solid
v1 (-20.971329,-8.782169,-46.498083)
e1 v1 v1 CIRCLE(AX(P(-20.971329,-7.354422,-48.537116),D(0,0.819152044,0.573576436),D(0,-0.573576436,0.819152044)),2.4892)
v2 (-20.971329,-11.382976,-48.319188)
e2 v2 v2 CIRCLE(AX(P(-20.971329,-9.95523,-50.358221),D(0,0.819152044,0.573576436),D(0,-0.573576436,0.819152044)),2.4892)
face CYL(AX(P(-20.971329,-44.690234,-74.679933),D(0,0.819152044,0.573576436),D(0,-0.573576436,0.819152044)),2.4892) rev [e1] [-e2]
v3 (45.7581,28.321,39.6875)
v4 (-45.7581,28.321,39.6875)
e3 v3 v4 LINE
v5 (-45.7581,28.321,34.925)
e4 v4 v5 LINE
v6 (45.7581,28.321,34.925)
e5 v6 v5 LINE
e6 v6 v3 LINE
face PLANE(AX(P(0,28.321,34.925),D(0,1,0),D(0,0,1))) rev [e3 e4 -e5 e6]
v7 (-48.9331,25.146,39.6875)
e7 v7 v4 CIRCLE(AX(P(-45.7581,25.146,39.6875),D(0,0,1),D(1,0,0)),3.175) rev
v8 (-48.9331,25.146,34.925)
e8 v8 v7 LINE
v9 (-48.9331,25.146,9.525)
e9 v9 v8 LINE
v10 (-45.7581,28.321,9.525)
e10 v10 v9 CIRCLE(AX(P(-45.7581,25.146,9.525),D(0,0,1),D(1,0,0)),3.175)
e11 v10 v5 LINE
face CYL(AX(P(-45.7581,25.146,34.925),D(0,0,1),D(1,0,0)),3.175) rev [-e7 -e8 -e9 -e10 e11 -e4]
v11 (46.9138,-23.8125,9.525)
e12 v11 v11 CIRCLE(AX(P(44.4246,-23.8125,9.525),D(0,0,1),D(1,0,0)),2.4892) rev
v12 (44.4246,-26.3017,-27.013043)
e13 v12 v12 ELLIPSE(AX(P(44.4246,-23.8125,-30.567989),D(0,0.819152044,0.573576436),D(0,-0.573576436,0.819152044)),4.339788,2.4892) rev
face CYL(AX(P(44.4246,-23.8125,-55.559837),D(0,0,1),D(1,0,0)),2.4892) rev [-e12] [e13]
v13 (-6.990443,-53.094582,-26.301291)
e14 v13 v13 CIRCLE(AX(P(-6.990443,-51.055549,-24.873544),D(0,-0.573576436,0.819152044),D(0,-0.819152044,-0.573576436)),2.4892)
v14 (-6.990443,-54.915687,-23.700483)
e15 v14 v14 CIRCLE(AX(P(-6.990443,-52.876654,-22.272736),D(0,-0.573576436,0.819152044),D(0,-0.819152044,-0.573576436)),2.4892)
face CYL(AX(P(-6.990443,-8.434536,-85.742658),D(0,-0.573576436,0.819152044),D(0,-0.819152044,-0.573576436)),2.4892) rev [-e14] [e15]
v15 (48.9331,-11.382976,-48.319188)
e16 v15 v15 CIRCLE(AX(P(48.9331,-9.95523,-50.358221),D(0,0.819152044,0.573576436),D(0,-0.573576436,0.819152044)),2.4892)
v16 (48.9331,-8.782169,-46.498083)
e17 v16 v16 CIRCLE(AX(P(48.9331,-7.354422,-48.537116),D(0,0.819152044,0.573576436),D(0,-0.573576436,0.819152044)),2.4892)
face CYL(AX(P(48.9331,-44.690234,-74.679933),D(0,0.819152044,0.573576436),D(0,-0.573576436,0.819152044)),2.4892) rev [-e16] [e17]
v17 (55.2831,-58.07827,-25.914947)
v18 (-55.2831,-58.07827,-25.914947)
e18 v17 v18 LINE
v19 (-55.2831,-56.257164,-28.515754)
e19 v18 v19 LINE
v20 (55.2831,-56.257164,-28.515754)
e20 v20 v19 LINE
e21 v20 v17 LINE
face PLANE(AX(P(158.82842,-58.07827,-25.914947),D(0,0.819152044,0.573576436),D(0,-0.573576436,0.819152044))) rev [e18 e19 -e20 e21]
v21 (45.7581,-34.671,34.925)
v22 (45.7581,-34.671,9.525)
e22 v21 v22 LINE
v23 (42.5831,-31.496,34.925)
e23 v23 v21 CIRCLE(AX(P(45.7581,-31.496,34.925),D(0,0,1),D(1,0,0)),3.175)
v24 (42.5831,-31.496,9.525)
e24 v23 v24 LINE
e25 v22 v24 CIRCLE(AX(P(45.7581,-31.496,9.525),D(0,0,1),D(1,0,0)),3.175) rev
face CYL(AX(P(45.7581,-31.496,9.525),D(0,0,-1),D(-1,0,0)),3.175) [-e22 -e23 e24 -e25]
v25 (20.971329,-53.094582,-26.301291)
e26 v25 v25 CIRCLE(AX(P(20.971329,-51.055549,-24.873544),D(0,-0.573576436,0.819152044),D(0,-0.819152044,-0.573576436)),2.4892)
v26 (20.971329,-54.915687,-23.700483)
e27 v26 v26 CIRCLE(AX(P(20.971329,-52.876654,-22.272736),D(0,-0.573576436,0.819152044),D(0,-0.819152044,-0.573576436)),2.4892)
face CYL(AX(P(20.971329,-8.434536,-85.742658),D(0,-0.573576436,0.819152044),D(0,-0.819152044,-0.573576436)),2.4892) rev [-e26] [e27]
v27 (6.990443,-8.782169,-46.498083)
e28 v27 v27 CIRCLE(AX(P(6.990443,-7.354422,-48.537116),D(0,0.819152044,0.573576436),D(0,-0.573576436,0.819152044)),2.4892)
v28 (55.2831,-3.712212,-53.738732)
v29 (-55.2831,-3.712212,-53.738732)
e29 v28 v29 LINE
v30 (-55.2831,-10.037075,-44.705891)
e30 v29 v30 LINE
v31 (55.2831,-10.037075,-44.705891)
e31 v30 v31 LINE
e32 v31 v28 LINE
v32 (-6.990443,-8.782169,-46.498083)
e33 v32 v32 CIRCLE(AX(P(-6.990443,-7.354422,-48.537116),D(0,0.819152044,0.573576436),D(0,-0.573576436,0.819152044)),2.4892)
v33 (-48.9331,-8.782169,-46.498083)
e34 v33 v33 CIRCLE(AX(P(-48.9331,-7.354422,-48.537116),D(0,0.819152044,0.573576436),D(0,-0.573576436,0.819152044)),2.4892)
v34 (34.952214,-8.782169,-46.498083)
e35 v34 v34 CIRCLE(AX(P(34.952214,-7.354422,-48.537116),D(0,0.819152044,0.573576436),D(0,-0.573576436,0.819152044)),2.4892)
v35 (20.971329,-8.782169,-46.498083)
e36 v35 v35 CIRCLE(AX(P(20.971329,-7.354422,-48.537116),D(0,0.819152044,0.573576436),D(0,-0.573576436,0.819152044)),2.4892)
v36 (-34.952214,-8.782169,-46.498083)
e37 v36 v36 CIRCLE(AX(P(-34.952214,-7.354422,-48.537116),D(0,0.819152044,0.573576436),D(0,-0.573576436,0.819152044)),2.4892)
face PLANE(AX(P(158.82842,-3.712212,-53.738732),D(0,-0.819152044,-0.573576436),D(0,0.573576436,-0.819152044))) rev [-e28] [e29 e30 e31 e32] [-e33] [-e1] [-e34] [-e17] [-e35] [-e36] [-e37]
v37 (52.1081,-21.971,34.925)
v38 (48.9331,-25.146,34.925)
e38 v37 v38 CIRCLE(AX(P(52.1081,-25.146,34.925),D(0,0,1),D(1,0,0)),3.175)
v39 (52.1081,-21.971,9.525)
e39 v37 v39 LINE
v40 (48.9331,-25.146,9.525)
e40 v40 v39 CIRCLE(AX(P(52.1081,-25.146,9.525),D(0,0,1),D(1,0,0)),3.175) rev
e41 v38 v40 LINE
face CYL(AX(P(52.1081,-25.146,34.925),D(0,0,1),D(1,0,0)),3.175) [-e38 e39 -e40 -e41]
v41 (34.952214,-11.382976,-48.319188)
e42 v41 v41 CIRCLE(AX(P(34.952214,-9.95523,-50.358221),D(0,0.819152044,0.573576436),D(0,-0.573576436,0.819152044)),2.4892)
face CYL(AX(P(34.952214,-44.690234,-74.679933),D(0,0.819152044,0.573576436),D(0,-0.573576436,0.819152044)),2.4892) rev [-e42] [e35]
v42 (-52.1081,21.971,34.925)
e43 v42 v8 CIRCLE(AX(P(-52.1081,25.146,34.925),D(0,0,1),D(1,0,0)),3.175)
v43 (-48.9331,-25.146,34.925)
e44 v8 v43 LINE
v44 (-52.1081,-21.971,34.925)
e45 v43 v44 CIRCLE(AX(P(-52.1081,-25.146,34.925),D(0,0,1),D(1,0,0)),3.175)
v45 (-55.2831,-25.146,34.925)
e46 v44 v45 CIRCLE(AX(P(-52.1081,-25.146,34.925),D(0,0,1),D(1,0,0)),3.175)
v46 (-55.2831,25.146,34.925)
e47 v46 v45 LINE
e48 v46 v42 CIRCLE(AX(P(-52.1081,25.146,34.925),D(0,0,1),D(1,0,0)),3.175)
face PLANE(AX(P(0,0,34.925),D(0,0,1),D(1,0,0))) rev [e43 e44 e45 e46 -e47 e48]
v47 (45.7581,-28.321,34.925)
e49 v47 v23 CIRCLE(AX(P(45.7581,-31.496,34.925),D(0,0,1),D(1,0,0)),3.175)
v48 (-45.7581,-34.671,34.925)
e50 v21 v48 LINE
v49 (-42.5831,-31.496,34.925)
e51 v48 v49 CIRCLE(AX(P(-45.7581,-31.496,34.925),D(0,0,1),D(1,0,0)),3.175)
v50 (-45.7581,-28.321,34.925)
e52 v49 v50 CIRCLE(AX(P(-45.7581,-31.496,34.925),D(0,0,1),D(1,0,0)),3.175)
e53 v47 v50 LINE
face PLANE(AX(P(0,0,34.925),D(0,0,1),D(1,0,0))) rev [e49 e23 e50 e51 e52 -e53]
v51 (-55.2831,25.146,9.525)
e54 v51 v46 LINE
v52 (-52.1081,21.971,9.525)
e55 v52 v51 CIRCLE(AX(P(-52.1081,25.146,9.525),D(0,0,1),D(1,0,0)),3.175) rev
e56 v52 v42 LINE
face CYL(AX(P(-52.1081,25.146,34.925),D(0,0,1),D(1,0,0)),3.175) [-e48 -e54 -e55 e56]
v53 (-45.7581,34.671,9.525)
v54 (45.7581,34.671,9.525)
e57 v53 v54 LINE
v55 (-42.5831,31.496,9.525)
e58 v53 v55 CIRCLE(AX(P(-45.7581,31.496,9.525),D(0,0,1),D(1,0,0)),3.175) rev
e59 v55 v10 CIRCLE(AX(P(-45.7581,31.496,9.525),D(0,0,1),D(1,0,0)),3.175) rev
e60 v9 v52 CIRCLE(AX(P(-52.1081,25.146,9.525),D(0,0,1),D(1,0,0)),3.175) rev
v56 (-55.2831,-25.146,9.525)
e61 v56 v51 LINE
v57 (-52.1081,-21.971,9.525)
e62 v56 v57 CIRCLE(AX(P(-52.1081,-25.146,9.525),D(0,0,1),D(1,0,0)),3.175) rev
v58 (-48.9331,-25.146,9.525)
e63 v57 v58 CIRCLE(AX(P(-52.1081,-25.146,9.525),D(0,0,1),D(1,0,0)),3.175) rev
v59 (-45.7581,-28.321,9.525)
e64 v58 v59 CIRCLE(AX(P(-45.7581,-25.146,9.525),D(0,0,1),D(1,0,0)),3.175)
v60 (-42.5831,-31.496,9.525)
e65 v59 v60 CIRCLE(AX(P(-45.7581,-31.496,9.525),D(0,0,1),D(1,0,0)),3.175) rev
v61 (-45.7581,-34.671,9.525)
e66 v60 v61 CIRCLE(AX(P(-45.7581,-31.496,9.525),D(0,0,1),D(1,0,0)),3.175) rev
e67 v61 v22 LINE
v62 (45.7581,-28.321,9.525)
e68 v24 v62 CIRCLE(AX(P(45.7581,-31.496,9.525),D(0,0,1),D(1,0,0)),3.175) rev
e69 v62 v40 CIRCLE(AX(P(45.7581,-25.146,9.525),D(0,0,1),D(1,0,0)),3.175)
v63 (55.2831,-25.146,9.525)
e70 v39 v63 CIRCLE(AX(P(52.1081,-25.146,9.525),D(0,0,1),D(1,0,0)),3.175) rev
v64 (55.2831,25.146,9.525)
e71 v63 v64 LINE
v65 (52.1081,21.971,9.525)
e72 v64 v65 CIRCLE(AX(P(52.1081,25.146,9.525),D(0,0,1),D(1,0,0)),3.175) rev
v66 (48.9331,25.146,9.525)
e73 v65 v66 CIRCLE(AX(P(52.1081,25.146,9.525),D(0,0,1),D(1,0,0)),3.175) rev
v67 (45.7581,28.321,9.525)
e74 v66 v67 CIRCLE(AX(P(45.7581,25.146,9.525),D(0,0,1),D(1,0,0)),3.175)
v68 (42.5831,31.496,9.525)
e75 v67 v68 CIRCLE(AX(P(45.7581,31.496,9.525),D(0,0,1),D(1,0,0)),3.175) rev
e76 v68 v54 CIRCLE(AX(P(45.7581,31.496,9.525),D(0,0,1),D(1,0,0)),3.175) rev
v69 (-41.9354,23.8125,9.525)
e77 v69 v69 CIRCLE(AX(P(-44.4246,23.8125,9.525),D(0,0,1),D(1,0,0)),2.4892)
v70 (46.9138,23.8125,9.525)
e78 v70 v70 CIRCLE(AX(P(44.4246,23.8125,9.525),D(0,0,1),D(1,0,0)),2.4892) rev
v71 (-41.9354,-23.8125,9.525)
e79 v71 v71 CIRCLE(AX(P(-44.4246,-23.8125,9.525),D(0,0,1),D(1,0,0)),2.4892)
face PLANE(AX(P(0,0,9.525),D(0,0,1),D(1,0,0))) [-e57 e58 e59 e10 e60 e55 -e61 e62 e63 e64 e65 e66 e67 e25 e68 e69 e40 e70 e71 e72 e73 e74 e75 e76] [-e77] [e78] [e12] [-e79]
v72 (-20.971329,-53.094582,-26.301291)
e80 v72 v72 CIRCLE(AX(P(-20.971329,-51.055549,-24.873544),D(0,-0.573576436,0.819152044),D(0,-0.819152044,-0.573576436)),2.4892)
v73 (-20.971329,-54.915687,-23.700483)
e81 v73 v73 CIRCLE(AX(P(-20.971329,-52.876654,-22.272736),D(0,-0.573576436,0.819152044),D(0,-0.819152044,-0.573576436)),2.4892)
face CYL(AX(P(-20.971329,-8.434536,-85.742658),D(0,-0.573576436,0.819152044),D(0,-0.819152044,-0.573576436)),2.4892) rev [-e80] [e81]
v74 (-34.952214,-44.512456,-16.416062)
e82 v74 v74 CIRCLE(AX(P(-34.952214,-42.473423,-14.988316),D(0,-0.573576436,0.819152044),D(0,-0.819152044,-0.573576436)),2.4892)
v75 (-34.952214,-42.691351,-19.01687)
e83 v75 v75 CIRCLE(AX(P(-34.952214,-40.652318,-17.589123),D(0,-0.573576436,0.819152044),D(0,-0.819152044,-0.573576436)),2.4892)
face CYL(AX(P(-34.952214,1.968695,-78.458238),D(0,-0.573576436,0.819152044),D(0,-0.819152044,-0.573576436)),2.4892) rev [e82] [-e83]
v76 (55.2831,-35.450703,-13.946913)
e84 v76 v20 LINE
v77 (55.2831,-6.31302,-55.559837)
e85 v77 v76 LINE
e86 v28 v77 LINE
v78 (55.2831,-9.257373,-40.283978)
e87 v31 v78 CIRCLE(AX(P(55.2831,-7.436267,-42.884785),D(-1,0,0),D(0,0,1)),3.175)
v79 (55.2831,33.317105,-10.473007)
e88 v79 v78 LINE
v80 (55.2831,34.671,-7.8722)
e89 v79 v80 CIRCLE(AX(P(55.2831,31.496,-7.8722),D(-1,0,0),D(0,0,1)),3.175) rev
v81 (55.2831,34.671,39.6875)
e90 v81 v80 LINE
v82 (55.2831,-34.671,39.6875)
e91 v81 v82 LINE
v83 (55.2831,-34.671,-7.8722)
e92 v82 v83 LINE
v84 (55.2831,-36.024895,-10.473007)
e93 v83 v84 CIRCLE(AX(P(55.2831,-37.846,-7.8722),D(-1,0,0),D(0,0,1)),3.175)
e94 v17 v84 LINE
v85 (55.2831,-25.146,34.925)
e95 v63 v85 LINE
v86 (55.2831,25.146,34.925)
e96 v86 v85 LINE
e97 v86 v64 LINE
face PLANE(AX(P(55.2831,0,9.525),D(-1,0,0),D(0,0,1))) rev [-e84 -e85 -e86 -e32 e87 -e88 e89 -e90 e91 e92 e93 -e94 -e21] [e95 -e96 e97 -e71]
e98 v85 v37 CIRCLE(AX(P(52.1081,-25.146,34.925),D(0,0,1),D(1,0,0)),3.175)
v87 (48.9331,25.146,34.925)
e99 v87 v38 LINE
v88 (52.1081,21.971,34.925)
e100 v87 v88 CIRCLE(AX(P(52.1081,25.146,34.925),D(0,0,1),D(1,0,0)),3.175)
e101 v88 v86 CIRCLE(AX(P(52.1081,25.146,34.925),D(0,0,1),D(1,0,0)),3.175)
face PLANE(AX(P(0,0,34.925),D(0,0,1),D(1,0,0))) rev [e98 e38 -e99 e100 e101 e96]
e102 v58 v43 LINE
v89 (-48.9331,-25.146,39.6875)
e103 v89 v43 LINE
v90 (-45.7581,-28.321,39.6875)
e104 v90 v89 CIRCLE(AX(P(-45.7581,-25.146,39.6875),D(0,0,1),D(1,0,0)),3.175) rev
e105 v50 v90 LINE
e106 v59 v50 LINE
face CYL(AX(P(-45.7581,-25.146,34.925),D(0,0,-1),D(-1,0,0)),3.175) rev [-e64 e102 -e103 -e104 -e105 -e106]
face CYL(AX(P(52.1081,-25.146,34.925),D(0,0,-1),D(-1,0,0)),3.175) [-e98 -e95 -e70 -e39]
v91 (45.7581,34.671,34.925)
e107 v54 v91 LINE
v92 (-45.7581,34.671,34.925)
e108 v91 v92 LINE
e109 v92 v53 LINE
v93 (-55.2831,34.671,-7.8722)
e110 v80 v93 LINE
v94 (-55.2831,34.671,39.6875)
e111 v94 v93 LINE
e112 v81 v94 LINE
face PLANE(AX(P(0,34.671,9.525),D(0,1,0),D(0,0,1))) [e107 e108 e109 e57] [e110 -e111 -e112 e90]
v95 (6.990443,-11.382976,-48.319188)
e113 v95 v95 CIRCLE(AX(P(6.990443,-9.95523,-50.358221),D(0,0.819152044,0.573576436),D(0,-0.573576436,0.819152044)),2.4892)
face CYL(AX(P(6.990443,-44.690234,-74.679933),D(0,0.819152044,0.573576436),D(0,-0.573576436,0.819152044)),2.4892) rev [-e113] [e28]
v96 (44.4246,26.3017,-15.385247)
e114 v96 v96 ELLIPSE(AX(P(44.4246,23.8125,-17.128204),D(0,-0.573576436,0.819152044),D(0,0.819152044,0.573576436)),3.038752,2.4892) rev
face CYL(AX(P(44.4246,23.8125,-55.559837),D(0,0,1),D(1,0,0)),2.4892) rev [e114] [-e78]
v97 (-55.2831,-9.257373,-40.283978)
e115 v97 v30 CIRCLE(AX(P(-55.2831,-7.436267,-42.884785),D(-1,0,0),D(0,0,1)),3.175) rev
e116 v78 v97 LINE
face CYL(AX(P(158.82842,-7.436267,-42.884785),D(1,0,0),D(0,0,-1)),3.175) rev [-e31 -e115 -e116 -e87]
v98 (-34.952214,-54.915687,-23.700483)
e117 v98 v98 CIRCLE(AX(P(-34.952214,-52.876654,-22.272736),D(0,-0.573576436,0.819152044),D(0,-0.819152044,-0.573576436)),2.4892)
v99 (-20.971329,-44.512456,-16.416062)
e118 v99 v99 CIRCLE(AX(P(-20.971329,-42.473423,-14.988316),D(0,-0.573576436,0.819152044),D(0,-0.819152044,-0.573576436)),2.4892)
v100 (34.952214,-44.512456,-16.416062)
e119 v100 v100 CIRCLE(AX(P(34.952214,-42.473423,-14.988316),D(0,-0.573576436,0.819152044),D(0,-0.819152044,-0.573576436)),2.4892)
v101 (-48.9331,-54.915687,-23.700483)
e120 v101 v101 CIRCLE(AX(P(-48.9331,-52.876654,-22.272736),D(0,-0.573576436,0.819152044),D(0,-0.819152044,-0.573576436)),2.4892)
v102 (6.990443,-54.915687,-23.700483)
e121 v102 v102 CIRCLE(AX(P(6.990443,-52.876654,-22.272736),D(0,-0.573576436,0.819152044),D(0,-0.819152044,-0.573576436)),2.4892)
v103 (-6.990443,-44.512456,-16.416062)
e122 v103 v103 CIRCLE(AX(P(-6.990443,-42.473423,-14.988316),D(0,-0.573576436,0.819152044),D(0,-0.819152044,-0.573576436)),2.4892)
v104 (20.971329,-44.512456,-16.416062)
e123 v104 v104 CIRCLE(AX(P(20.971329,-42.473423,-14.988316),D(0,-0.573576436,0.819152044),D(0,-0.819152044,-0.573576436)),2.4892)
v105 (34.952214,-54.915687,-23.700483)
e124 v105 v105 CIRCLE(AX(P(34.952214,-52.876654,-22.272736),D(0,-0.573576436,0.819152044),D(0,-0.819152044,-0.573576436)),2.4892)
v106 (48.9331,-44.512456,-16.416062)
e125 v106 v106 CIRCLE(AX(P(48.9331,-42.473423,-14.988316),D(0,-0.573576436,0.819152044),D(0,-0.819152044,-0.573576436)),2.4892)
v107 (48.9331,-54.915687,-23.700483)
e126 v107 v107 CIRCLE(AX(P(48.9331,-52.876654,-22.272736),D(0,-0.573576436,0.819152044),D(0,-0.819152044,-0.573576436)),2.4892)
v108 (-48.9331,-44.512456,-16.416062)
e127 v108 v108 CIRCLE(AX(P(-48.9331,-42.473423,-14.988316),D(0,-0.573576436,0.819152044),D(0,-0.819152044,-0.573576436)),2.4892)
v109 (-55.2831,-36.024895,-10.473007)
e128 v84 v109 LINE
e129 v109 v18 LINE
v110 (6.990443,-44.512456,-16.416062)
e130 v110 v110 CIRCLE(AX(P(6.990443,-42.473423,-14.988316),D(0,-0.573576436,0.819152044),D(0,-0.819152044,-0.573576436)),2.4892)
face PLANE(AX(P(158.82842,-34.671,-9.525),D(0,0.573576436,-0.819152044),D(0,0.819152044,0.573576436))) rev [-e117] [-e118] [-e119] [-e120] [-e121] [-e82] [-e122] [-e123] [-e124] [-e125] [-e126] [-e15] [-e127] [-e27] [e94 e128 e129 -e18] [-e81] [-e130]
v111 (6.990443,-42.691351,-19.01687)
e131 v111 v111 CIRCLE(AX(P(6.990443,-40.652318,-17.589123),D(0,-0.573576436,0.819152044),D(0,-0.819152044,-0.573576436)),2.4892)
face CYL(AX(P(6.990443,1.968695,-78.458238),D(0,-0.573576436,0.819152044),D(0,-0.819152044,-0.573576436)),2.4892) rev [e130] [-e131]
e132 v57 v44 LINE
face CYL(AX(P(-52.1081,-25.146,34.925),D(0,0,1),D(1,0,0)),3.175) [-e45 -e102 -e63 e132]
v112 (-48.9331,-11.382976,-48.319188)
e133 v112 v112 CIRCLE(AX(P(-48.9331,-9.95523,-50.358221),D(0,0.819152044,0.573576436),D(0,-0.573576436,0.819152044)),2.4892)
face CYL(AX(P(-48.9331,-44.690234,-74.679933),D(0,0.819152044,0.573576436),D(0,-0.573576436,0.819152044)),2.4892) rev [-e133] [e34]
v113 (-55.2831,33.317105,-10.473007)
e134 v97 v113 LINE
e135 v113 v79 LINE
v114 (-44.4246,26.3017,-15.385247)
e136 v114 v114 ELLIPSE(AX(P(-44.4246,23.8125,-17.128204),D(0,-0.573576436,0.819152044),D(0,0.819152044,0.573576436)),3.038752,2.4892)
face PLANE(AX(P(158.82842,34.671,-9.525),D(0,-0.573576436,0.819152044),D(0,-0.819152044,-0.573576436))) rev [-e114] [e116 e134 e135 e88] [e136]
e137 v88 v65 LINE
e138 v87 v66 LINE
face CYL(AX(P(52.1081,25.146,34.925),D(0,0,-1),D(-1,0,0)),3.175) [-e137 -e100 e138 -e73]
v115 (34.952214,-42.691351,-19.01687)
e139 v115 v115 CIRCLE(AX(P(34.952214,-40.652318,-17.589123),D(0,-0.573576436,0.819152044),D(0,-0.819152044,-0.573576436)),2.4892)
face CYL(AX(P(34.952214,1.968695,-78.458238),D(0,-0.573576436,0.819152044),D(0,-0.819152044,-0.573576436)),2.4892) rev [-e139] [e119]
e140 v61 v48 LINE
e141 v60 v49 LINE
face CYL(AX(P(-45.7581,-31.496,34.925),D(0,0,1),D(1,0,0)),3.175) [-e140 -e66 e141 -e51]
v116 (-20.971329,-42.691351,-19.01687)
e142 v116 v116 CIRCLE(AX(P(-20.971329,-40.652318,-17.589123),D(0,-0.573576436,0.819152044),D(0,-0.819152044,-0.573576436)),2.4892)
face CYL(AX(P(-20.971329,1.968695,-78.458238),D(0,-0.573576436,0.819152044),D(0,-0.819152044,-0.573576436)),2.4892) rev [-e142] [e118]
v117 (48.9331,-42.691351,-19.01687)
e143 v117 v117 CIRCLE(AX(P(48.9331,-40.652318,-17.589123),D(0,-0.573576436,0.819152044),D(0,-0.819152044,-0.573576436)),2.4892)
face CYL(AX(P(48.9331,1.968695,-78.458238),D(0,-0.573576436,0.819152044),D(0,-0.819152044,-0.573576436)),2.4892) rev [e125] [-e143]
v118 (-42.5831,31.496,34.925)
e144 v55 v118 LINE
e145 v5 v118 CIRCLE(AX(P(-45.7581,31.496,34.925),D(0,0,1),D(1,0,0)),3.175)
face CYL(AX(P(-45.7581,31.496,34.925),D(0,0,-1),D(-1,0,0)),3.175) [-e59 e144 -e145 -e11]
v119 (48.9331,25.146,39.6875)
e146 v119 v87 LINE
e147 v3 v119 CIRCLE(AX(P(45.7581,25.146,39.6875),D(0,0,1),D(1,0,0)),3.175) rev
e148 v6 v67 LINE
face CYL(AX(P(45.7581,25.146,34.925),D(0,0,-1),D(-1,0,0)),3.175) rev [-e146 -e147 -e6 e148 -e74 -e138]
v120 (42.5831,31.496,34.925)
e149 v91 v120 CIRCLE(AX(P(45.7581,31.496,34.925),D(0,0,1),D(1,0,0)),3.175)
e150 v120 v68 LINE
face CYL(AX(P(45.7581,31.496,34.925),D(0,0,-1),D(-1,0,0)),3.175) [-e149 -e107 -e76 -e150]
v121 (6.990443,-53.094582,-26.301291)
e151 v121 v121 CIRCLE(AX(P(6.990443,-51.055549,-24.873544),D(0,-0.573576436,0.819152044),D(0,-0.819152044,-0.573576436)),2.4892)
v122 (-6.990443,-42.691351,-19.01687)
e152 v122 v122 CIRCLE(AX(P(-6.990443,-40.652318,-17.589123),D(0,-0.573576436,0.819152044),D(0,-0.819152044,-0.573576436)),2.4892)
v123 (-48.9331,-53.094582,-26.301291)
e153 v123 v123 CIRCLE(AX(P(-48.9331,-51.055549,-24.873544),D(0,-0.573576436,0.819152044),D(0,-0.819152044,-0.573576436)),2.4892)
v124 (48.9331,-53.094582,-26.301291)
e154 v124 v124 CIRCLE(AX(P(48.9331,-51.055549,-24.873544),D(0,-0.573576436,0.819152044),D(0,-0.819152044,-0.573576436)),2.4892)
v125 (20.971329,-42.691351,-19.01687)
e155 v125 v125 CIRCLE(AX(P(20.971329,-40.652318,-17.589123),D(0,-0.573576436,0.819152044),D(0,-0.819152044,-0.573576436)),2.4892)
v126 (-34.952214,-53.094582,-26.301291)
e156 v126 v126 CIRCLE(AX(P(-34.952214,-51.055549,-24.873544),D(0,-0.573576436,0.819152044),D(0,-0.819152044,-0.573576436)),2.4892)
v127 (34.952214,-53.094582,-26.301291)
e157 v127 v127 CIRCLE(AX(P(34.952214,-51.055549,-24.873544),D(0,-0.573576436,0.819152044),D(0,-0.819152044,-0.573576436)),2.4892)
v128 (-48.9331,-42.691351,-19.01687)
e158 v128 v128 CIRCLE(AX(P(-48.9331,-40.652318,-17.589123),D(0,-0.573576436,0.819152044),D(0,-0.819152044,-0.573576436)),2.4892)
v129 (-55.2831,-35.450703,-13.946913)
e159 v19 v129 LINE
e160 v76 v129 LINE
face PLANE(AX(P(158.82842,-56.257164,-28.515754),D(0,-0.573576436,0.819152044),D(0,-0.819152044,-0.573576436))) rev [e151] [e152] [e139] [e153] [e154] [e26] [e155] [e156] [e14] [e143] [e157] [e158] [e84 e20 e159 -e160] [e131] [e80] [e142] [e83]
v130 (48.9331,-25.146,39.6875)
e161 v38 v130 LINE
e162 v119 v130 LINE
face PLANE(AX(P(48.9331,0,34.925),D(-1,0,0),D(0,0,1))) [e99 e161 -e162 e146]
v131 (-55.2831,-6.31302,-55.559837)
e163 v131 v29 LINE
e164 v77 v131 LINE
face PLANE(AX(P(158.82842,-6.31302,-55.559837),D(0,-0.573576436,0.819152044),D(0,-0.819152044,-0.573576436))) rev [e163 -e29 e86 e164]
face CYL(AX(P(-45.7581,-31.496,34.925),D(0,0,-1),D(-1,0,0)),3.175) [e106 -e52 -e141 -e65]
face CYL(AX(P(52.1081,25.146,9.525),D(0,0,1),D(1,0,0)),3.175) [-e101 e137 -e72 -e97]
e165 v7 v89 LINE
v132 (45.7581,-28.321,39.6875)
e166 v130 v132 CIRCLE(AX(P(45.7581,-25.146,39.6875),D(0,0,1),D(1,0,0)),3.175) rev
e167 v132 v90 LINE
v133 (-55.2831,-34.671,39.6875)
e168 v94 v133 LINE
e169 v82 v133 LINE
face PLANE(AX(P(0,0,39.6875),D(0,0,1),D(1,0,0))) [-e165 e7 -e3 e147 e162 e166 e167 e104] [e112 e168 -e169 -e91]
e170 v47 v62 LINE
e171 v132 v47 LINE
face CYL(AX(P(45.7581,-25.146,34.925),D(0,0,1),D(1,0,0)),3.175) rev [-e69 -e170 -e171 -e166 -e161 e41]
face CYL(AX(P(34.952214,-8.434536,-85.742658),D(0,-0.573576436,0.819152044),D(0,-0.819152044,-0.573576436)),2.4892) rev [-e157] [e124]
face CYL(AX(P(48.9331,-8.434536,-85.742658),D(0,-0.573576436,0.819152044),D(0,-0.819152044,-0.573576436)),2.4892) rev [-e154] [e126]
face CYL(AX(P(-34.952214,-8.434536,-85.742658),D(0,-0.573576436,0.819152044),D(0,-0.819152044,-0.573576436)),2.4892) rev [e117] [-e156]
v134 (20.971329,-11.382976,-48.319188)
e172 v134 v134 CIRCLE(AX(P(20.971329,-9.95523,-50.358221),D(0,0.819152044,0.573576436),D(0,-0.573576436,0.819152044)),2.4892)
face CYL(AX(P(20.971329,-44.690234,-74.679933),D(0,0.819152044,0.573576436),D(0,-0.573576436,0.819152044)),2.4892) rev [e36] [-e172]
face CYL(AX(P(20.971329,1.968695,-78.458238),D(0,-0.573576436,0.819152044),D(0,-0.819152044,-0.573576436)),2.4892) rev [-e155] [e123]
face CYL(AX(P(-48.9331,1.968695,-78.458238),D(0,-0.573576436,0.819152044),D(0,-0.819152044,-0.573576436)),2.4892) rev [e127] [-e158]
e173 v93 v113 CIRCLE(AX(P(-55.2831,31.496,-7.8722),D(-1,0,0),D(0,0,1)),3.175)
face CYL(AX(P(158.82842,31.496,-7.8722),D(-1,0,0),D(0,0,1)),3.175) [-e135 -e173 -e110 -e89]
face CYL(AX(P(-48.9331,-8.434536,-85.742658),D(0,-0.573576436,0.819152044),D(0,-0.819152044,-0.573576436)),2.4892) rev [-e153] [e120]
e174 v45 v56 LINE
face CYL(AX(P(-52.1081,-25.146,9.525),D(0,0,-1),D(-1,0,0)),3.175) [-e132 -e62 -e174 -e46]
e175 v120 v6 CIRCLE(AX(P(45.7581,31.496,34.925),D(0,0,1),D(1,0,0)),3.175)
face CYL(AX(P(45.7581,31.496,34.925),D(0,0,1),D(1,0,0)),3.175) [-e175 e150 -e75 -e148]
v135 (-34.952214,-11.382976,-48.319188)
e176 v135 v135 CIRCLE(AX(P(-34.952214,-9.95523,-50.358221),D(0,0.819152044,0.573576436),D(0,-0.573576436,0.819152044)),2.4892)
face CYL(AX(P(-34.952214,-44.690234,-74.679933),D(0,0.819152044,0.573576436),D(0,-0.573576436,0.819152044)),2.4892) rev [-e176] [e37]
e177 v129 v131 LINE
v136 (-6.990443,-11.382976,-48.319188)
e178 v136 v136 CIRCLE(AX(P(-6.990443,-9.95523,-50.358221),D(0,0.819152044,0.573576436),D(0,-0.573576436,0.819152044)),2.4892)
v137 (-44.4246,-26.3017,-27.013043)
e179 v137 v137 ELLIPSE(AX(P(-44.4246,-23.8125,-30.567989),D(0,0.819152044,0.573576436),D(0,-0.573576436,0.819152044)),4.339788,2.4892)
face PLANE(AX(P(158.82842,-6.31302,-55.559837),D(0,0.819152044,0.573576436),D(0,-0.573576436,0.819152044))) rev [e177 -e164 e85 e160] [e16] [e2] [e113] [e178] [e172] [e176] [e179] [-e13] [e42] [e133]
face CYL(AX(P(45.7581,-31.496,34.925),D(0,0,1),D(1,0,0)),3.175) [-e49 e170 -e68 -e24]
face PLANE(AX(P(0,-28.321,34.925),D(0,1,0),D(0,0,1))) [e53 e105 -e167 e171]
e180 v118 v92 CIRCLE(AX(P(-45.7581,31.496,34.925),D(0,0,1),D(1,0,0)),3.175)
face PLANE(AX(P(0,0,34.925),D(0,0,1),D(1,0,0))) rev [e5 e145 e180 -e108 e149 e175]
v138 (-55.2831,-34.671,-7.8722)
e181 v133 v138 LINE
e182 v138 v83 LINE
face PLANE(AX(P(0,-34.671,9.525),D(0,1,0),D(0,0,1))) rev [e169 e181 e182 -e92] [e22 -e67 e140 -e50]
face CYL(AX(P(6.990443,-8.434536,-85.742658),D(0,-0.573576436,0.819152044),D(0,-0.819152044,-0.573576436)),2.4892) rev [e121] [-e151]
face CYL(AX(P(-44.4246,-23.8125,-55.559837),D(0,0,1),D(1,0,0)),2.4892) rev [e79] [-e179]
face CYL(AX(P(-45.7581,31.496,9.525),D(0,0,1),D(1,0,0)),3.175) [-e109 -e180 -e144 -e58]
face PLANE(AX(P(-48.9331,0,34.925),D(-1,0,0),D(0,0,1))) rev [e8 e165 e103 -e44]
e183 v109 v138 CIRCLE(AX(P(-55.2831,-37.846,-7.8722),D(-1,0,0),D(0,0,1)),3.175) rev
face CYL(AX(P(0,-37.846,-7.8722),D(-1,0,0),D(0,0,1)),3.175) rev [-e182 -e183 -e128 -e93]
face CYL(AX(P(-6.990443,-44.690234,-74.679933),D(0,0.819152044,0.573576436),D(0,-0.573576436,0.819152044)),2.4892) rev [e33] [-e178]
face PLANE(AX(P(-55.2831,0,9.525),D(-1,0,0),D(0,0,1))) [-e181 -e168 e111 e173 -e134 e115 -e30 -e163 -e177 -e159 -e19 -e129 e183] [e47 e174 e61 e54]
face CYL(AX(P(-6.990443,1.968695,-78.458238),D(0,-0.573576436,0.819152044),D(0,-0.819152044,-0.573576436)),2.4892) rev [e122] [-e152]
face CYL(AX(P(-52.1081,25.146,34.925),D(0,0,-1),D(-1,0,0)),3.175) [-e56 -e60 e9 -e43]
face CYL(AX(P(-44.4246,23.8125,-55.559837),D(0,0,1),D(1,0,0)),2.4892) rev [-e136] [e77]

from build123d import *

# Parameters (mm, degrees)
SKETCH1_W               = 110.5662
SKETCH1_H               = 69.342
BOSS_EXTRUDE1_DEPTH     = 9.525
BOSS_EXTRUDE2_DEPTH     = 34.925
BOSS_EXTRUDE3_START     = 34.925
SKETCH1_5_W             = 85.1662
SKETCH1_5_H             = 6.35
SKETCH1_5_W_2           = 6.35
SKETCH1_5_H_2           = 43.942
BOSS_EXTRUDE3_DEPTH     = 4.7625
BOSS_EXTRUDE4_START     = -55.2831
BOSS_EXTRUDE4_DEPTH     = 110.5662
CUT_EXTRUDE3_DEPTH      = 98.551022627
CUT_EXTRUDE3_DEPTH_BACK = 98.551022627
SKETCH1_6_R             = 2.4892
CUT_EXTRUDE1_DEPTH      = 100.785108409
CUT_EXTRUDE1_DEPTH_BACK = 100.785108409
SKETCH3_R               = 2.4892
CUT_EXTRUDE2_DEPTH      = 103.20307776
CUT_EXTRUDE2_DEPTH_BACK = 103.20307776
SKETCH4_R               = 2.4892
FILLET1_R               = 3.175
FILLET2_R               = 3.175


with BuildPart() as part:
    # Sketch1 → Boss-Extrude1 (new, symmetric)
    with BuildSketch(Plane.XY):
        Rectangle(SKETCH1_W, SKETCH1_H)
    extrude(amount=BOSS_EXTRUDE1_DEPTH, both=True)

    # Sketch1<3> → Boss-Extrude2 (add)
    with BuildSketch(Plane.XY):
        Polygon((-55.2831, 21.971), (-48.9331, 21.971), (-48.9331, 28.321), (-42.5831, 28.321), (-42.5831, 34.671), (-55.2831, 34.671), align=None)
        Polygon((48.9331, 28.321), (48.9331, 21.971), (55.2831, 21.971), (55.2831, 34.671), (42.5831, 34.671), (42.5831, 28.321), align=None)
        Polygon((-42.5831, -28.321), (-48.9331, -28.321), (-48.9331, -21.971), (-55.2831, -21.971), (-55.2831, -34.671), (-42.5831, -34.671), align=None)
        Polygon((48.9331, -28.321), (42.5831, -28.321), (42.5831, -34.671), (55.2831, -34.671), (55.2831, -21.971), (48.9331, -21.971), align=None)
    extrude(amount=BOSS_EXTRUDE2_DEPTH)

    # Sketch1<5> → Boss-Extrude3 (add)
    with BuildSketch(Plane.XY.offset(BOSS_EXTRUDE3_START)):
        with Locations((0, 31.496)):
            Rectangle(SKETCH1_5_W, SKETCH1_5_H)
        Polygon((48.9331, 28.321), (48.9331, 21.971), (55.2831, 21.971), (55.2831, 34.671), (42.5831, 34.671), (42.5831, 28.321), align=None)
        with Locations((52.1081, 0)):
            Rectangle(SKETCH1_5_W_2, SKETCH1_5_H_2)
        Polygon((48.9331, -28.321), (42.5831, -28.321), (42.5831, -34.671), (55.2831, -34.671), (55.2831, -21.971), (48.9331, -21.971), align=None)
        with Locations((0, -31.496)):
            Rectangle(SKETCH1_5_W, SKETCH1_5_H)
        Polygon((-42.5831, -28.321), (-48.9331, -28.321), (-48.9331, -21.971), (-55.2831, -21.971), (-55.2831, -34.671), (-42.5831, -34.671), align=None)
        with Locations((-52.1081, 0)):
            Rectangle(SKETCH1_5_W_2, SKETCH1_5_H_2)
        Polygon((-55.2831, 21.971), (-48.9331, 21.971), (-48.9331, 28.321), (-42.5831, 28.321), (-42.5831, 34.671), (-55.2831, 34.671), align=None)
    extrude(amount=BOSS_EXTRUDE3_DEPTH)

    # Sketch2 → Boss-Extrude4 (add)
    with BuildSketch(Plane(origin=(0, 0, 0), x_dir=(0, 0, -1), z_dir=(1, 0, 0)).offset(BOSS_EXTRUDE4_START)):
        Polygon((9.525, 34.671), (9.525, -34.671), (25.914946669, -58.078269666), (28.515754409, -56.25716448), (13.946912926, -35.450702555), (55.559836776, -6.313019589), (53.73873159, -3.712211848), (42.105082855, -11.858180389), align=None)
    extrude(amount=BOSS_EXTRUDE4_DEPTH)

    # Sketch1<6> → Cut-Extrude3 (cut, two sides: drawn at the far end of the back side and taken through both)
    with BuildSketch(Plane.XY.offset(-CUT_EXTRUDE3_DEPTH_BACK)):
        with Locations((-44.4246, 23.8125)):
            Circle(SKETCH1_6_R)
        with Locations((44.4246, 23.8125)):
            Circle(SKETCH1_6_R)
        with Locations((44.4246, -23.8125)):
            Circle(SKETCH1_6_R)
        with Locations((-44.4246, -23.8125)):
            Circle(SKETCH1_6_R)
    extrude(amount=CUT_EXTRUDE3_DEPTH + CUT_EXTRUDE3_DEPTH_BACK, mode=Mode.SUBTRACT)

    # Sketch3 → Cut-Extrude1 (cut, two sides: drawn at the far end of the back side and taken through both)
    with BuildSketch(Plane(origin=(0, -6.931123699, 9.898670495), x_dir=(1, 0, 0), z_dir=(0, -0.5735764363510447, 0.8191520442889929)).offset(-CUT_EXTRUDE1_DEPTH_BACK)):
        with Locations(Location((-48.9331, -56.089136084, 0), (0, 0, 270))):
            Circle(SKETCH3_R)
        with Locations(Location((-34.952214286, -56.089136084, 0), (0, 0, 270))):
            Circle(SKETCH3_R)
        with Locations(Location((-20.971328571, -56.089136084, 0), (0, 0, 270))):
            Circle(SKETCH3_R)
        with Locations(Location((-6.990442857, -56.089136084, 0), (0, 0, 270))):
            Circle(SKETCH3_R)
        with Locations(Location((6.990442857, -56.089136084, 0), (0, 0, 270))):
            Circle(SKETCH3_R)
        with Locations(Location((20.971328571, -56.089136084, 0), (0, 0, 270))):
            Circle(SKETCH3_R)
        with Locations(Location((34.952214286, -56.089136084, 0), (0, 0, 270))):
            Circle(SKETCH3_R)
        with Locations(Location((48.9331, -56.089136084, 0), (0, 0, 270))):
            Circle(SKETCH3_R)
        with Locations(Location((-34.952214286, -43.389136084, 0), (0, 0, 270))):
            Circle(SKETCH3_R)
        with Locations(Location((-20.971328571, -43.389136084, 0), (0, 0, 270))):
            Circle(SKETCH3_R)
        with Locations(Location((-6.990442857, -43.389136084, 0), (0, 0, 270))):
            Circle(SKETCH3_R)
        with Locations(Location((6.990442857, -43.389136084, 0), (0, 0, 270))):
            Circle(SKETCH3_R)
        with Locations(Location((20.971328571, -43.389136084, 0), (0, 0, 270))):
            Circle(SKETCH3_R)
        with Locations(Location((34.952214286, -43.389136084, 0), (0, 0, 270))):
            Circle(SKETCH3_R)
        with Locations(Location((48.9331, -43.389136084, 0), (0, 0, 270))):
            Circle(SKETCH3_R)
        with Locations(Location((-48.9331, -43.389136084, 0), (0, 0, 270))):
            Circle(SKETCH3_R)
    extrude(amount=CUT_EXTRUDE1_DEPTH + CUT_EXTRUDE1_DEPTH_BACK, mode=Mode.SUBTRACT)

    # Sketch4 → Cut-Extrude2 (cut, two sides: drawn at the far end of the back side and taken through both)
    with BuildSketch(Plane(origin=(0, -27.739876301, -19.423670495), x_dir=(1, 0, 0), z_dir=(0, 0.8191520442889928, 0.5735764363510449)).offset(-CUT_EXTRUDE2_DEPTH_BACK)):
        with Locations(Location((48.9331, 35.540954597, 0), (0, 0, 270))):
            Circle(SKETCH4_R)
        with Locations(Location((34.952214286, 35.540954597, 0), (0, 0, 270))):
            Circle(SKETCH4_R)
        with Locations(Location((20.971328571, 35.540954597, 0), (0, 0, 270))):
            Circle(SKETCH4_R)
        with Locations(Location((6.990442857, 35.540954597, 0), (0, 0, 270))):
            Circle(SKETCH4_R)
        with Locations(Location((-6.990442857, 35.540954597, 0), (0, 0, 270))):
            Circle(SKETCH4_R)
        with Locations(Location((-20.971328571, 35.540954597, 0), (0, 0, 270))):
            Circle(SKETCH4_R)
        with Locations(Location((-34.952214286, 35.540954597, 0), (0, 0, 270))):
            Circle(SKETCH4_R)
        with Locations(Location((-48.9331, 35.540954597, 0), (0, 0, 270))):
            Circle(SKETCH4_R)
    extrude(amount=CUT_EXTRUDE2_DEPTH + CUT_EXTRUDE2_DEPTH_BACK, mode=Mode.SUBTRACT)

    # Fillet1
    fillet1_edges = [part.edges().sort_by_distance(p)[0] for p in [
        (0, -11.858180389, -42.105082855),
        (0, 34.671, -9.525),
        (0, -34.671, -9.525),
    ]]
    fillet(fillet1_edges, radius=FILLET1_R)

    # Fillet2
    fillet2_edges = [part.edges().sort_by_distance(p)[0] for p in [
        (48.9331, -28.321, 24.60625),
        (42.5831, -28.321, 22.225),
        (-42.5831, -28.321, 22.225),
        (-48.9331, -28.321, 24.60625),
        (-48.9331, 21.971, 22.225),
        (-48.9331, 28.321, 24.60625),
        (-42.5831, 28.321, 22.225),
        (42.5831, 28.321, 22.225),
        (48.9331, 28.321, 24.60625),
        (48.9331, 21.971, 22.225),
        (48.9331, -21.971, 22.225),
        (-48.9331, -21.971, 22.225),
        (55.2831, 21.971, 22.225),
        (-42.5831, -34.671, 22.225),
        (42.5831, -34.671, 22.225),
        (55.2831, -21.971, 22.225),
        (-55.2831, -21.971, 22.225),
        (-55.2831, 21.971, 22.225),
        (-42.5831, 34.671, 22.225),
        (42.5831, 34.671, 22.225),
    ]]
    fillet(fillet2_edges, radius=FILLET2_R - 0.0001)  # a hair under: the kernel refuses the full size


solid = part.part
